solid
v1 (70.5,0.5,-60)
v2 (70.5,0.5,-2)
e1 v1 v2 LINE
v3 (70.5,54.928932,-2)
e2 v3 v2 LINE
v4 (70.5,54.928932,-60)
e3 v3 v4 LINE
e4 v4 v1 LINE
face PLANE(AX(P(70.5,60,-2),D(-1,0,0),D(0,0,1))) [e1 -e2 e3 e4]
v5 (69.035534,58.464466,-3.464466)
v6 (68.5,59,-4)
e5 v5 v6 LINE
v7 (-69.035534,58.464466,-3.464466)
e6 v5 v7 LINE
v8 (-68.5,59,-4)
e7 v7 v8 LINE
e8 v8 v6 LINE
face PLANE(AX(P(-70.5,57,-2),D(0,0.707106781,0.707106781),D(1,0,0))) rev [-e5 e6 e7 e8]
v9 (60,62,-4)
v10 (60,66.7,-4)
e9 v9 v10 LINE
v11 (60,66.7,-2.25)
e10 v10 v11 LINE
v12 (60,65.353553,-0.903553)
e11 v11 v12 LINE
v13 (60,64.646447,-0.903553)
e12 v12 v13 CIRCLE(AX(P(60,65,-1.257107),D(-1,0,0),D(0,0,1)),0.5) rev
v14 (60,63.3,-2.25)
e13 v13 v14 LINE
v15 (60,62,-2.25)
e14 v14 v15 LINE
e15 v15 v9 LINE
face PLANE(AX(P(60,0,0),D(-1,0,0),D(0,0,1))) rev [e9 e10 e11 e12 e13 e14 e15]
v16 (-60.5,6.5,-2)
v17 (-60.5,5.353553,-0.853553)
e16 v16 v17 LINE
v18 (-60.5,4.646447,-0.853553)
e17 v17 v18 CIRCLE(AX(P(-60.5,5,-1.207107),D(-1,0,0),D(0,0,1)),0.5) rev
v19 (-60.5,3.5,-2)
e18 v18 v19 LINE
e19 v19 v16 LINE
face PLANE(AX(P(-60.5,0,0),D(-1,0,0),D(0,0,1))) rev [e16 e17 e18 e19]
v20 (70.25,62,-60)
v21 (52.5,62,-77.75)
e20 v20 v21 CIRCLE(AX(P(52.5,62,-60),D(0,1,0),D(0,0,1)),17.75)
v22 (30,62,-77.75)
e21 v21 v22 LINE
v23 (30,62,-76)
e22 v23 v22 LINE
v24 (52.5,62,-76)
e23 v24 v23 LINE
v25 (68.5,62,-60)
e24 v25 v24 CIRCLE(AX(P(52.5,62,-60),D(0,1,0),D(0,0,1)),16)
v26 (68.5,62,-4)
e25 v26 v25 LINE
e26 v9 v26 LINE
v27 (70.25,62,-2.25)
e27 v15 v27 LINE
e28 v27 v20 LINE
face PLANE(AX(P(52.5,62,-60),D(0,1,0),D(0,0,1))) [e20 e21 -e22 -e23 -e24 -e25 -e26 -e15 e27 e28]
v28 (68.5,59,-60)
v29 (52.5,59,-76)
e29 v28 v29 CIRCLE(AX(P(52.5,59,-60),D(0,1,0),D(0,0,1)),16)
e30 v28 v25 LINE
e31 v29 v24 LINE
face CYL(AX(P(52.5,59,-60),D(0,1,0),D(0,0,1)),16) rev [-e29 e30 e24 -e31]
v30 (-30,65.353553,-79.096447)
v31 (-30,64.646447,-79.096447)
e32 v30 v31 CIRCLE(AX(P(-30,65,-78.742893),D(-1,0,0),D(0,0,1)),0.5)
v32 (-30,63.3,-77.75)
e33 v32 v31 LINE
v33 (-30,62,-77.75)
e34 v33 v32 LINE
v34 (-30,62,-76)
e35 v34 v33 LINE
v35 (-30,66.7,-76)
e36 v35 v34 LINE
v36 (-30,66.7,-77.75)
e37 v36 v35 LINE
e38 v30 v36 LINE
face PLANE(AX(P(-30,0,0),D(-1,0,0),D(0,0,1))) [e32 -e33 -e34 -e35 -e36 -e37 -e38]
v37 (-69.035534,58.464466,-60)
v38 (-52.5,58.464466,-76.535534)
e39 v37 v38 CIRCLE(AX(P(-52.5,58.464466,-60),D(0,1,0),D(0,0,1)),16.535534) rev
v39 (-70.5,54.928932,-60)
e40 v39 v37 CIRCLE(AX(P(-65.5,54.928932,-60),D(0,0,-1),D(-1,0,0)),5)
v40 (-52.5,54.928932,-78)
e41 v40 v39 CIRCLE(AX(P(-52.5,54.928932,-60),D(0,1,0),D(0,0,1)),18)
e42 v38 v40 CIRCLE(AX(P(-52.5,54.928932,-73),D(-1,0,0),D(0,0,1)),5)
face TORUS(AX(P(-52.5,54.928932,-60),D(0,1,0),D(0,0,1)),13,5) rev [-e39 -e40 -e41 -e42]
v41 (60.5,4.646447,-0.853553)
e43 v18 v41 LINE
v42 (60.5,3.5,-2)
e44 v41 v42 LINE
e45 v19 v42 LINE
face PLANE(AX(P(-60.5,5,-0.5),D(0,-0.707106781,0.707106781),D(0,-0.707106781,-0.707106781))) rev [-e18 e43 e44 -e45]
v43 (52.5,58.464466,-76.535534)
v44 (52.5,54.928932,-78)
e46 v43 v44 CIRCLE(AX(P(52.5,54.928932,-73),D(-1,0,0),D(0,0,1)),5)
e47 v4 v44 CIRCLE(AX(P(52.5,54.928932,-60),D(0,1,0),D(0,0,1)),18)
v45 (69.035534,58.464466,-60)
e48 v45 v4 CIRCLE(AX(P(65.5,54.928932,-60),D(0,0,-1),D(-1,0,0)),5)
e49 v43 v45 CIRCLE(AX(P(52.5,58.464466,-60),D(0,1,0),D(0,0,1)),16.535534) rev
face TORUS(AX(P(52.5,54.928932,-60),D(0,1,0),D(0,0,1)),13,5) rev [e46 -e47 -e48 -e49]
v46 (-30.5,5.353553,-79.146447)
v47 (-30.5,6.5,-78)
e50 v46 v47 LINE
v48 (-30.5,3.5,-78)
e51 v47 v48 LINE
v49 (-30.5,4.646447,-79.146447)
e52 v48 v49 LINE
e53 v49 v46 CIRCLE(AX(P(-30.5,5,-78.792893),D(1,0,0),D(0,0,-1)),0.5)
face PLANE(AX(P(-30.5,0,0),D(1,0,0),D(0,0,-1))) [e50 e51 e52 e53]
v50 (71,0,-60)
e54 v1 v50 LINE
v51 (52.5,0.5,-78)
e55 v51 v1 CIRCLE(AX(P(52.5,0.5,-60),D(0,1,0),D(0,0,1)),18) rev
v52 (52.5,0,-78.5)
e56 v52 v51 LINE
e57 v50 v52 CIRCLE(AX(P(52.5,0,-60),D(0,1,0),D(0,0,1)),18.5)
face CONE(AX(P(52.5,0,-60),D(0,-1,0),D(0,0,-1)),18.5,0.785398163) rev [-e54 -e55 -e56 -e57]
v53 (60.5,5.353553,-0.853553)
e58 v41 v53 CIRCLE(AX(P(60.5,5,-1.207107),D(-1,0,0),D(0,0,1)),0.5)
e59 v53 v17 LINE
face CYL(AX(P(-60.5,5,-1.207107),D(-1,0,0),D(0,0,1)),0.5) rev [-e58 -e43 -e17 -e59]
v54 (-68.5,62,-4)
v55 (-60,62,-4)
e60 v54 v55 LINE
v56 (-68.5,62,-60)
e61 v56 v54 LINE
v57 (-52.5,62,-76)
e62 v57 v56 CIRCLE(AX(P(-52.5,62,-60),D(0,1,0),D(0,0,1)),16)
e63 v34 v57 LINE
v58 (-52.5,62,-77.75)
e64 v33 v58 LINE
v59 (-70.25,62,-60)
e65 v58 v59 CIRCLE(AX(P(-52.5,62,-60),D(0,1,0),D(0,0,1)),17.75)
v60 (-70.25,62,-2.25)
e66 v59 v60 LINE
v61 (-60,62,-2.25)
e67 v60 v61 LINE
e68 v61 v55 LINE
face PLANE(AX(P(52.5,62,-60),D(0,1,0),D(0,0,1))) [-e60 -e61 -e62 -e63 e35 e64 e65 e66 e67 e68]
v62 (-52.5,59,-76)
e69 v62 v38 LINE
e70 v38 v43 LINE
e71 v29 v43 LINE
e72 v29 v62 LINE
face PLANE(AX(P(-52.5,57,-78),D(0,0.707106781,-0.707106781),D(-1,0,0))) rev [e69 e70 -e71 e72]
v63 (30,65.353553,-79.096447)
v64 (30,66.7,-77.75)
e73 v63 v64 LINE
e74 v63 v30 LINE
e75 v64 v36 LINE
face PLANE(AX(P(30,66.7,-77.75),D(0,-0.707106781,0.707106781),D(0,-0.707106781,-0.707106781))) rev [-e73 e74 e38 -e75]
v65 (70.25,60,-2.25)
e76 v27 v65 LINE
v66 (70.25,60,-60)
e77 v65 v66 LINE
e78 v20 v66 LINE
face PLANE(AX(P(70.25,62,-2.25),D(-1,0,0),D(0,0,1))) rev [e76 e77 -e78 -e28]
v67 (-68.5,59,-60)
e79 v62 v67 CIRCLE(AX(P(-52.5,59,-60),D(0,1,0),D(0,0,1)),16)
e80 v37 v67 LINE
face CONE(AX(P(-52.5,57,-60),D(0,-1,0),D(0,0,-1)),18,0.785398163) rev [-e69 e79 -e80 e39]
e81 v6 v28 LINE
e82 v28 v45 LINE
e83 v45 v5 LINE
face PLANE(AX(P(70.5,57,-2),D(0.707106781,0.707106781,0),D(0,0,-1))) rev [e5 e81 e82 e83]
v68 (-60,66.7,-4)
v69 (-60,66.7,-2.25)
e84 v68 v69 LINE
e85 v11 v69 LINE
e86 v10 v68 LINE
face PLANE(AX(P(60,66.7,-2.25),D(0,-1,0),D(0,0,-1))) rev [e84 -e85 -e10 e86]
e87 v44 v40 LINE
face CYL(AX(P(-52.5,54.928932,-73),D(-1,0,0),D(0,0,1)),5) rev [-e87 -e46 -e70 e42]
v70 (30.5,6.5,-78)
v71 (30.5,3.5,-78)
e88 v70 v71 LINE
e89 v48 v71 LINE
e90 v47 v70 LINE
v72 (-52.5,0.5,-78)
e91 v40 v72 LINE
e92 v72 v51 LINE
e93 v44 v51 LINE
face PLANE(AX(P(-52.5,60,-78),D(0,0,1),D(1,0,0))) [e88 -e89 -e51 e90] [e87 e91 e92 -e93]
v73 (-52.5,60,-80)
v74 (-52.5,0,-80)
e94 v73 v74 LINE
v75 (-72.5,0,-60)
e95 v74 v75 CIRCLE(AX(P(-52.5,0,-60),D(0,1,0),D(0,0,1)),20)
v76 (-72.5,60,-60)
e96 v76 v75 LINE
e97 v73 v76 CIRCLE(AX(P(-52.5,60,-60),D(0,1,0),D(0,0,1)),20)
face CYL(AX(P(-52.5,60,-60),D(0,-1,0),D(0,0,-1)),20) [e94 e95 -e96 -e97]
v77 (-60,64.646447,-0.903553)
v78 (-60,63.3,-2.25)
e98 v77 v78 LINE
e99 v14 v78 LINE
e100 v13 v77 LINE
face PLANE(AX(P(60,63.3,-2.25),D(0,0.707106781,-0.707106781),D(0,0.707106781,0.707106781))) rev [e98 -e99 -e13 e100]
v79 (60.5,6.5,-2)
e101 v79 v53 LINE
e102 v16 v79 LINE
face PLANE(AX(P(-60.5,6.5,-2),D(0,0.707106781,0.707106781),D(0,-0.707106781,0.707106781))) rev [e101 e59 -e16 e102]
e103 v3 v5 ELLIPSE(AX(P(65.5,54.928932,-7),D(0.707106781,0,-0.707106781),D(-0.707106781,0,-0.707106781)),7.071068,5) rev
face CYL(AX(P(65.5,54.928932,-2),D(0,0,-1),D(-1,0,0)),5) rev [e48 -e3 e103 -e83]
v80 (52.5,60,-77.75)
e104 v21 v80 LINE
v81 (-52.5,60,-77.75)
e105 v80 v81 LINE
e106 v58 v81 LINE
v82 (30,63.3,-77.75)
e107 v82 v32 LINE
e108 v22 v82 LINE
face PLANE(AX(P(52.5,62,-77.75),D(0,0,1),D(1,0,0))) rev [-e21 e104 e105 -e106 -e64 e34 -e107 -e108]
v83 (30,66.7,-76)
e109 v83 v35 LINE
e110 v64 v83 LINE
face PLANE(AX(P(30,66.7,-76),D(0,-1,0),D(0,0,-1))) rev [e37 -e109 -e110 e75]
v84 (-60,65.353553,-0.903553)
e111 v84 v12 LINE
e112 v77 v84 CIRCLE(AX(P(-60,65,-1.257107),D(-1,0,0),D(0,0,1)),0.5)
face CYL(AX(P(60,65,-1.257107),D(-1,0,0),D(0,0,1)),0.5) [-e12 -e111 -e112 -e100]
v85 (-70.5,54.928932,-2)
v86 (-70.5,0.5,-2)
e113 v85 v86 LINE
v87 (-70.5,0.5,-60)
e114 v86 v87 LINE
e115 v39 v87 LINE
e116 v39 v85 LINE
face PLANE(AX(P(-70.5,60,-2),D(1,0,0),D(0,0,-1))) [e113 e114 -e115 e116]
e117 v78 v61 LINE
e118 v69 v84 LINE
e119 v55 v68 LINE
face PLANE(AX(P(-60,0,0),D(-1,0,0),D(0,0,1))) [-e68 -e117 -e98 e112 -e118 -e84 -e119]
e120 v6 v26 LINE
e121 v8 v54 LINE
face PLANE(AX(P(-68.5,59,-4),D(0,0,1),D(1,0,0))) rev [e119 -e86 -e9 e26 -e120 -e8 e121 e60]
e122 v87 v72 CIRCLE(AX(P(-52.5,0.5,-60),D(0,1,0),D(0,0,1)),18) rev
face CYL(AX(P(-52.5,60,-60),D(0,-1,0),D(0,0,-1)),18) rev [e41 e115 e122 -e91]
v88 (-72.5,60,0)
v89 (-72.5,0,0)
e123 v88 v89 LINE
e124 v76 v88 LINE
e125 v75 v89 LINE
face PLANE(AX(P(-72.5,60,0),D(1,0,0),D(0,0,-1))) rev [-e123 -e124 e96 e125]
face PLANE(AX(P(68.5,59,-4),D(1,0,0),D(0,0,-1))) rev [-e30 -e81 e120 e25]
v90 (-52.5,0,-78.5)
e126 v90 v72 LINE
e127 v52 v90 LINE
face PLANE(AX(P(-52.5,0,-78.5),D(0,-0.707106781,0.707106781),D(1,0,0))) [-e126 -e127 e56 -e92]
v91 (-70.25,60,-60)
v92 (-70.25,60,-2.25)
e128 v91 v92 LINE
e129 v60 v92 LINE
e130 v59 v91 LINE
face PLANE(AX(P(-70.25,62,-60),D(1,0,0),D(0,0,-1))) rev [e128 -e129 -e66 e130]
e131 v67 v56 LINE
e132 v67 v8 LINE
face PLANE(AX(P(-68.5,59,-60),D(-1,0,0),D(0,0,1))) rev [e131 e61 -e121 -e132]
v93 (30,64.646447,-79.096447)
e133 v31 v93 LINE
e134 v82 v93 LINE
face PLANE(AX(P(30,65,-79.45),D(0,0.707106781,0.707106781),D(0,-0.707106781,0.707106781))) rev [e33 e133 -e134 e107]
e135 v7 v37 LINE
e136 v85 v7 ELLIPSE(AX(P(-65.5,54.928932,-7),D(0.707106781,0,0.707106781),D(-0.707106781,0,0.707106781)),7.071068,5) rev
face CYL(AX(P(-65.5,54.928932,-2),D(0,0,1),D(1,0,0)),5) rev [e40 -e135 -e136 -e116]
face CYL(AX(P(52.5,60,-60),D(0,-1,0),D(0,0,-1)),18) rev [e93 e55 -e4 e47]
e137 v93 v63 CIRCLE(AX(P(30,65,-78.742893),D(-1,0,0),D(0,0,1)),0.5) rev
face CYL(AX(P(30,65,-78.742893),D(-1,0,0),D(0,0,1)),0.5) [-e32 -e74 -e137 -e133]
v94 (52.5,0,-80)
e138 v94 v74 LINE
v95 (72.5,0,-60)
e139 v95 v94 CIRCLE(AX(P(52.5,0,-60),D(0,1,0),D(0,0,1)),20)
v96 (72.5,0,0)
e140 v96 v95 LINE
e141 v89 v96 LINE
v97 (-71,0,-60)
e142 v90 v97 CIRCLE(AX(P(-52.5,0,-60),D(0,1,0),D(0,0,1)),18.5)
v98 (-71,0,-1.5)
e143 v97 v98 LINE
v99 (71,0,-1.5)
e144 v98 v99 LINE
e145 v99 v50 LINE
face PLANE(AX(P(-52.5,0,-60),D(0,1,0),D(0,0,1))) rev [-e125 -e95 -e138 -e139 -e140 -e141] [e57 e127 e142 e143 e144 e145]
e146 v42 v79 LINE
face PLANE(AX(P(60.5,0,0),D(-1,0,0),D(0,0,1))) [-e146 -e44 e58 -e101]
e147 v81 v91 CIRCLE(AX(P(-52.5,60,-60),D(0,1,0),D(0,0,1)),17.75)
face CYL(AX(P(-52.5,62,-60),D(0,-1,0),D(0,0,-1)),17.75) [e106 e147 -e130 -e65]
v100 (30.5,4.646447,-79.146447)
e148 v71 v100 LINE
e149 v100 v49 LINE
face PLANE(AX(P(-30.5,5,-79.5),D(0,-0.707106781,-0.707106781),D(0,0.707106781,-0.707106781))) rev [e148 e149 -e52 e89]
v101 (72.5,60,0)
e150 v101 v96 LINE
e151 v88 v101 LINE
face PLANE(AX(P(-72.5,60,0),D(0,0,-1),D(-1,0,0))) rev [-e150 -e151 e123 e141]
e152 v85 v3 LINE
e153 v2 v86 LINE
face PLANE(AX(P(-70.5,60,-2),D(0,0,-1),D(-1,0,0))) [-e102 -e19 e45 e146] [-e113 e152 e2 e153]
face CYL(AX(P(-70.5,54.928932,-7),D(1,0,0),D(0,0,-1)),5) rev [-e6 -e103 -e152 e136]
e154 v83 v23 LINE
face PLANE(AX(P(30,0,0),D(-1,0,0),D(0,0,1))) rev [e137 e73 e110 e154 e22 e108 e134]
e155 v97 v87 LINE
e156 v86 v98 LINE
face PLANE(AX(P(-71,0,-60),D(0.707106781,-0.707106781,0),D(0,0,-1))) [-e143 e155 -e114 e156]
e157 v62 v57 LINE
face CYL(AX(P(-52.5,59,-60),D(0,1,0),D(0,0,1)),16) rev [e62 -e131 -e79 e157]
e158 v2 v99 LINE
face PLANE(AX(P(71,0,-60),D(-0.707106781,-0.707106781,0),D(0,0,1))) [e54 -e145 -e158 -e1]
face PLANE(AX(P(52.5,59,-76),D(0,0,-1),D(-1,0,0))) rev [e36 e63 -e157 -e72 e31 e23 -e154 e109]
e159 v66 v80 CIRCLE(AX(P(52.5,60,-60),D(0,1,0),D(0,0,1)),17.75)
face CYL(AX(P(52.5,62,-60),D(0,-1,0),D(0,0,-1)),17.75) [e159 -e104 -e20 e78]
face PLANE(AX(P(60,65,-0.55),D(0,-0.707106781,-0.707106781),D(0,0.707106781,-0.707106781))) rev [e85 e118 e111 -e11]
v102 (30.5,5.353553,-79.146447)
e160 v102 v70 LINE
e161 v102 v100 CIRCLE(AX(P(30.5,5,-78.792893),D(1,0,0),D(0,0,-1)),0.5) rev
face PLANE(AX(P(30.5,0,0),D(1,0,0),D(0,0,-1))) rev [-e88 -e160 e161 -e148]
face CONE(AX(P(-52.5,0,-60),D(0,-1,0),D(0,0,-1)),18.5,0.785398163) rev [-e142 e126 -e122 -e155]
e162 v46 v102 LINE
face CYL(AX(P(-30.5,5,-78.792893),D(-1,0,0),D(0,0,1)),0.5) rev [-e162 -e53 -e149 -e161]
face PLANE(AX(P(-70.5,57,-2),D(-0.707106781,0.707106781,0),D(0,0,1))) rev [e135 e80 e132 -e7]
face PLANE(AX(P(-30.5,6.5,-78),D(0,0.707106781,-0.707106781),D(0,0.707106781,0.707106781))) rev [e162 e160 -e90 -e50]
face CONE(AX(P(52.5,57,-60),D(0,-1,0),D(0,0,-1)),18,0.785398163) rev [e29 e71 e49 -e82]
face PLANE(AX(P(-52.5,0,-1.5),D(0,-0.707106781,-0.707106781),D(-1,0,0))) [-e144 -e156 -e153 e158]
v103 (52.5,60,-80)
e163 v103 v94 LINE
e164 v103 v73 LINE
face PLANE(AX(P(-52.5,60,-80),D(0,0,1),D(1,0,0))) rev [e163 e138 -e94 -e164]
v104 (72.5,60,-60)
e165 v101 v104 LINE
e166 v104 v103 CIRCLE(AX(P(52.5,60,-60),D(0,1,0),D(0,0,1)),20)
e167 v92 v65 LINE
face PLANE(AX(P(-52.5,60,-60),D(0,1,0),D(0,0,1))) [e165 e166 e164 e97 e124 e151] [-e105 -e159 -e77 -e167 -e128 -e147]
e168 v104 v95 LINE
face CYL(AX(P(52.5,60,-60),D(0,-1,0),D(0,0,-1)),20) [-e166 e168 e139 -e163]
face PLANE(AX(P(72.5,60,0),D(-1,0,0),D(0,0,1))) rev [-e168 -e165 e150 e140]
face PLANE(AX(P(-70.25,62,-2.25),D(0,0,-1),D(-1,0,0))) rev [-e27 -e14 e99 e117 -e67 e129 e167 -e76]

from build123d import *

# Parameters (mm, degrees)
EXTRUDE_1_DEPTH     = 60
EXTRUDE_START       = -1
EXTRUDE_2_DEPTH     = 1
CHAMFER_3_SIZE      = 2
EXTRUDE_8_DEPTH     = 2
EXTRUDE_9_DEPTH     = 30
EXTRUDE_10_DEPTH    = 60
CUT_EXTRUDE_2_DEPTH = 60.5
CUT_EXTRUDE_3_DEPTH = 30.5
CHAMFER_6_SIZE      = 0.5
FILLET_3_R          = 5
FILLET_4_R          = 0.5
FILLET_5_R          = 0.5


with BuildPart() as part:
    # Эскиз1 → Бобышка-Вытянуть1 (new body)
    with BuildSketch(Plane(origin=(0, 0, 0), x_dir=(1, 0, 0), z_dir=(0, 1, 0))):
        with BuildLine():
            Line((-72.5, 0), (72.5, 0))
            Line((72.5, 0), (72.5, 60))
            ThreePointArc((72.5, 60), (66.642135624, 74.142135624), (52.5, 80))
            Line((52.5, 80), (-52.5, 80))
            ThreePointArc((-52.5, 80), (-66.642135624, 74.142135624), (-72.5, 60))
            Line((-72.5, 60), (-72.5, 0))
        make_face()
        with BuildLine():
            Line((-70.5, 2), (70.5, 2))
            Line((70.5, 2), (70.5, 60))
            ThreePointArc((70.5, 60), (65.227922061, 72.727922061), (52.5, 78))
            Line((52.5, 78), (-52.5, 78))
            ThreePointArc((-52.5, 78), (-65.227922061, 72.727922061), (-70.5, 60))
            Line((-70.5, 60), (-70.5, 2))
        make_face(mode=Mode.SUBTRACT)
    extrude(amount=EXTRUDE_1_DEPTH)

    # Эскиз2 → Бобышка-Вытянуть2 (add)
    with BuildSketch(Plane(origin=(0, 60, 0), x_dir=(1, 0, 0), z_dir=(0, 1, 0)).offset(EXTRUDE_START)):
        with BuildLine():
            Line((-72.5, 60), (-72.5, 0))
            Line((-72.5, 0), (72.5, 0))
            Line((72.5, 0), (72.5, 60))
            ThreePointArc((72.5, 60), (66.642135624, 74.142135624), (52.5, 80))
            Line((52.5, 80), (-52.5, 80))
            ThreePointArc((-52.5, 80), (-66.642135624, 74.142135624), (-72.5, 60))
        make_face()
        with BuildLine():
            Line((-68.5, 60), (-68.5, 4))
            Line((-68.5, 4), (68.5, 4))
            Line((68.5, 4), (68.5, 60))
            ThreePointArc((68.5, 60), (63.813708499, 71.313708499), (52.5, 76))
            Line((52.5, 76), (-52.5, 76))
            ThreePointArc((-52.5, 76), (-63.813708499, 71.313708499), (-68.5, 60))
        make_face(mode=Mode.SUBTRACT)
    extrude(amount=EXTRUDE_2_DEPTH)

    # Фаска3
    chamfer_3_edges = [part.edges().sort_by_distance(p)[0] for p in [
        (-65.227922061, 59, -72.727922061),
        (-70.5, 59, -31),
        (0, 59, -2),
        (70.5, 59, -31),
        (65.227922061, 59, -72.727922061),
        (0, 59, -78),
    ]]
    chamfer(chamfer_3_edges, length=CHAMFER_3_SIZE - 0.0001)  # a hair under: the kernel refuses the full size

    # Эскиз11 → Бобышка-Вытянуть8 (add)
    with BuildSketch(Plane(origin=(0, 60, 0), x_dir=(1, 0, 0), z_dir=(0, 1, 0))):
        with BuildLine():
            Line((70.25, 2.25), (70.25, 60))
            ThreePointArc((70.25, 60), (65.051145366, 72.551145366), (52.5, 77.75))
            Line((52.5, 77.75), (-52.5, 77.75))
            ThreePointArc((-52.5, 77.75), (-65.051145366, 72.551145366), (-70.25, 60))
            Line((-70.25, 60), (-70.25, 2.25))
            Line((-70.25, 2.25), (70.25, 2.25))
        make_face()
        with BuildLine():
            Line((68.5, 4), (68.5, 60))
            ThreePointArc((68.5, 60), (63.813708499, 71.313708499), (52.5, 76))
            Line((52.5, 76), (-52.5, 76))
            ThreePointArc((-52.5, 76), (-63.813708499, 71.313708499), (-68.5, 60))
            Line((-68.5, 60), (-68.5, 4))
            Line((-68.5, 4), (68.5, 4))
        make_face(mode=Mode.SUBTRACT)
    extrude(amount=EXTRUDE_8_DEPTH)

    # Эскиз12 → Бобышка-Вытянуть9 (add, symmetric)
    with BuildSketch(Plane(origin=(0, 0, 0), x_dir=(0, 0, -1), z_dir=(1, 0, 0))):
        Polygon((76, 62), (76, 66.7), (77.75, 66.7), (79.45, 65), (77.75, 63.3), (77.75, 62), align=None)
    extrude(amount=EXTRUDE_9_DEPTH, both=True)

    # Эскиз13 → Бобышка-Вытянуть10 (add, symmetric)
    with BuildSketch(Plane(origin=(0, 0, 0), x_dir=(0, 0, -1), z_dir=(1, 0, 0))):
        Polygon((2.25, 62), (2.25, 63.3), (0.55, 65), (2.25, 66.7), (4, 66.7), (4, 62), align=None)
    extrude(amount=EXTRUDE_10_DEPTH, both=True)

    # Эскиз15 → Вырез-Вытянуть2 (cut, symmetric)
    with BuildSketch(Plane(origin=(0, 0, 0), x_dir=(0, 0, -1), z_dir=(1, 0, 0))):
        Polygon((2, 3.5), (2, 6.5), (0.5, 5), align=None)
    extrude(amount=CUT_EXTRUDE_2_DEPTH, both=True, mode=Mode.SUBTRACT)

    # Эскиз16 → Вырез-Вытянуть3 (cut, symmetric)
    with BuildSketch(Plane(origin=(0, 0, 0), x_dir=(0, 0, -1), z_dir=(1, 0, 0))):
        Polygon((78, 3.5), (78, 6.5), (79.5, 5), align=None)
    extrude(amount=CUT_EXTRUDE_3_DEPTH, both=True, mode=Mode.SUBTRACT)

    # Фаска6
    chamfer_6_edges = [part.edges().sort_by_distance(p)[0] for p in [
        (-70.5, 0, -31),
        (0, 0, -2),
        (70.5, 0, -31),
        (65.227922061, 0, -72.727922061),
        (0, 0, -78),
        (-65.227922061, 0, -72.727922061),
    ]]
    chamfer(chamfer_6_edges, length=CHAMFER_6_SIZE)

    # Скругление3
    fillet_3_edges = [part.edges().sort_by_distance(p)[0] for p in [
        (70.5, 57.0001, -31),
        (65.227922061, 57.0001, -72.727922061),
        (0, 57.0001, -78),
        (-65.227922061, 57.0001, -72.727922061),
        (0, 57.0001, -2),
        (-70.5, 57.0001, -31),
    ]]
    fillet(fillet_3_edges, radius=FILLET_3_R)

    # Скругление4
    fillet_4_edges = [part.edges().sort_by_distance(p)[0] for p in [
        (0, 5, -0.5),
        (0, 5, -79.5),
    ]]
    fillet(fillet_4_edges, radius=FILLET_4_R)

    # Скругление5
    fillet_5_edges = [part.edges().sort_by_distance(p)[0] for p in [
        (0, 65, -79.45),
        (0, 65, -0.55),
    ]]
    fillet(fillet_5_edges, radius=FILLET_5_R)


solid = part.part
